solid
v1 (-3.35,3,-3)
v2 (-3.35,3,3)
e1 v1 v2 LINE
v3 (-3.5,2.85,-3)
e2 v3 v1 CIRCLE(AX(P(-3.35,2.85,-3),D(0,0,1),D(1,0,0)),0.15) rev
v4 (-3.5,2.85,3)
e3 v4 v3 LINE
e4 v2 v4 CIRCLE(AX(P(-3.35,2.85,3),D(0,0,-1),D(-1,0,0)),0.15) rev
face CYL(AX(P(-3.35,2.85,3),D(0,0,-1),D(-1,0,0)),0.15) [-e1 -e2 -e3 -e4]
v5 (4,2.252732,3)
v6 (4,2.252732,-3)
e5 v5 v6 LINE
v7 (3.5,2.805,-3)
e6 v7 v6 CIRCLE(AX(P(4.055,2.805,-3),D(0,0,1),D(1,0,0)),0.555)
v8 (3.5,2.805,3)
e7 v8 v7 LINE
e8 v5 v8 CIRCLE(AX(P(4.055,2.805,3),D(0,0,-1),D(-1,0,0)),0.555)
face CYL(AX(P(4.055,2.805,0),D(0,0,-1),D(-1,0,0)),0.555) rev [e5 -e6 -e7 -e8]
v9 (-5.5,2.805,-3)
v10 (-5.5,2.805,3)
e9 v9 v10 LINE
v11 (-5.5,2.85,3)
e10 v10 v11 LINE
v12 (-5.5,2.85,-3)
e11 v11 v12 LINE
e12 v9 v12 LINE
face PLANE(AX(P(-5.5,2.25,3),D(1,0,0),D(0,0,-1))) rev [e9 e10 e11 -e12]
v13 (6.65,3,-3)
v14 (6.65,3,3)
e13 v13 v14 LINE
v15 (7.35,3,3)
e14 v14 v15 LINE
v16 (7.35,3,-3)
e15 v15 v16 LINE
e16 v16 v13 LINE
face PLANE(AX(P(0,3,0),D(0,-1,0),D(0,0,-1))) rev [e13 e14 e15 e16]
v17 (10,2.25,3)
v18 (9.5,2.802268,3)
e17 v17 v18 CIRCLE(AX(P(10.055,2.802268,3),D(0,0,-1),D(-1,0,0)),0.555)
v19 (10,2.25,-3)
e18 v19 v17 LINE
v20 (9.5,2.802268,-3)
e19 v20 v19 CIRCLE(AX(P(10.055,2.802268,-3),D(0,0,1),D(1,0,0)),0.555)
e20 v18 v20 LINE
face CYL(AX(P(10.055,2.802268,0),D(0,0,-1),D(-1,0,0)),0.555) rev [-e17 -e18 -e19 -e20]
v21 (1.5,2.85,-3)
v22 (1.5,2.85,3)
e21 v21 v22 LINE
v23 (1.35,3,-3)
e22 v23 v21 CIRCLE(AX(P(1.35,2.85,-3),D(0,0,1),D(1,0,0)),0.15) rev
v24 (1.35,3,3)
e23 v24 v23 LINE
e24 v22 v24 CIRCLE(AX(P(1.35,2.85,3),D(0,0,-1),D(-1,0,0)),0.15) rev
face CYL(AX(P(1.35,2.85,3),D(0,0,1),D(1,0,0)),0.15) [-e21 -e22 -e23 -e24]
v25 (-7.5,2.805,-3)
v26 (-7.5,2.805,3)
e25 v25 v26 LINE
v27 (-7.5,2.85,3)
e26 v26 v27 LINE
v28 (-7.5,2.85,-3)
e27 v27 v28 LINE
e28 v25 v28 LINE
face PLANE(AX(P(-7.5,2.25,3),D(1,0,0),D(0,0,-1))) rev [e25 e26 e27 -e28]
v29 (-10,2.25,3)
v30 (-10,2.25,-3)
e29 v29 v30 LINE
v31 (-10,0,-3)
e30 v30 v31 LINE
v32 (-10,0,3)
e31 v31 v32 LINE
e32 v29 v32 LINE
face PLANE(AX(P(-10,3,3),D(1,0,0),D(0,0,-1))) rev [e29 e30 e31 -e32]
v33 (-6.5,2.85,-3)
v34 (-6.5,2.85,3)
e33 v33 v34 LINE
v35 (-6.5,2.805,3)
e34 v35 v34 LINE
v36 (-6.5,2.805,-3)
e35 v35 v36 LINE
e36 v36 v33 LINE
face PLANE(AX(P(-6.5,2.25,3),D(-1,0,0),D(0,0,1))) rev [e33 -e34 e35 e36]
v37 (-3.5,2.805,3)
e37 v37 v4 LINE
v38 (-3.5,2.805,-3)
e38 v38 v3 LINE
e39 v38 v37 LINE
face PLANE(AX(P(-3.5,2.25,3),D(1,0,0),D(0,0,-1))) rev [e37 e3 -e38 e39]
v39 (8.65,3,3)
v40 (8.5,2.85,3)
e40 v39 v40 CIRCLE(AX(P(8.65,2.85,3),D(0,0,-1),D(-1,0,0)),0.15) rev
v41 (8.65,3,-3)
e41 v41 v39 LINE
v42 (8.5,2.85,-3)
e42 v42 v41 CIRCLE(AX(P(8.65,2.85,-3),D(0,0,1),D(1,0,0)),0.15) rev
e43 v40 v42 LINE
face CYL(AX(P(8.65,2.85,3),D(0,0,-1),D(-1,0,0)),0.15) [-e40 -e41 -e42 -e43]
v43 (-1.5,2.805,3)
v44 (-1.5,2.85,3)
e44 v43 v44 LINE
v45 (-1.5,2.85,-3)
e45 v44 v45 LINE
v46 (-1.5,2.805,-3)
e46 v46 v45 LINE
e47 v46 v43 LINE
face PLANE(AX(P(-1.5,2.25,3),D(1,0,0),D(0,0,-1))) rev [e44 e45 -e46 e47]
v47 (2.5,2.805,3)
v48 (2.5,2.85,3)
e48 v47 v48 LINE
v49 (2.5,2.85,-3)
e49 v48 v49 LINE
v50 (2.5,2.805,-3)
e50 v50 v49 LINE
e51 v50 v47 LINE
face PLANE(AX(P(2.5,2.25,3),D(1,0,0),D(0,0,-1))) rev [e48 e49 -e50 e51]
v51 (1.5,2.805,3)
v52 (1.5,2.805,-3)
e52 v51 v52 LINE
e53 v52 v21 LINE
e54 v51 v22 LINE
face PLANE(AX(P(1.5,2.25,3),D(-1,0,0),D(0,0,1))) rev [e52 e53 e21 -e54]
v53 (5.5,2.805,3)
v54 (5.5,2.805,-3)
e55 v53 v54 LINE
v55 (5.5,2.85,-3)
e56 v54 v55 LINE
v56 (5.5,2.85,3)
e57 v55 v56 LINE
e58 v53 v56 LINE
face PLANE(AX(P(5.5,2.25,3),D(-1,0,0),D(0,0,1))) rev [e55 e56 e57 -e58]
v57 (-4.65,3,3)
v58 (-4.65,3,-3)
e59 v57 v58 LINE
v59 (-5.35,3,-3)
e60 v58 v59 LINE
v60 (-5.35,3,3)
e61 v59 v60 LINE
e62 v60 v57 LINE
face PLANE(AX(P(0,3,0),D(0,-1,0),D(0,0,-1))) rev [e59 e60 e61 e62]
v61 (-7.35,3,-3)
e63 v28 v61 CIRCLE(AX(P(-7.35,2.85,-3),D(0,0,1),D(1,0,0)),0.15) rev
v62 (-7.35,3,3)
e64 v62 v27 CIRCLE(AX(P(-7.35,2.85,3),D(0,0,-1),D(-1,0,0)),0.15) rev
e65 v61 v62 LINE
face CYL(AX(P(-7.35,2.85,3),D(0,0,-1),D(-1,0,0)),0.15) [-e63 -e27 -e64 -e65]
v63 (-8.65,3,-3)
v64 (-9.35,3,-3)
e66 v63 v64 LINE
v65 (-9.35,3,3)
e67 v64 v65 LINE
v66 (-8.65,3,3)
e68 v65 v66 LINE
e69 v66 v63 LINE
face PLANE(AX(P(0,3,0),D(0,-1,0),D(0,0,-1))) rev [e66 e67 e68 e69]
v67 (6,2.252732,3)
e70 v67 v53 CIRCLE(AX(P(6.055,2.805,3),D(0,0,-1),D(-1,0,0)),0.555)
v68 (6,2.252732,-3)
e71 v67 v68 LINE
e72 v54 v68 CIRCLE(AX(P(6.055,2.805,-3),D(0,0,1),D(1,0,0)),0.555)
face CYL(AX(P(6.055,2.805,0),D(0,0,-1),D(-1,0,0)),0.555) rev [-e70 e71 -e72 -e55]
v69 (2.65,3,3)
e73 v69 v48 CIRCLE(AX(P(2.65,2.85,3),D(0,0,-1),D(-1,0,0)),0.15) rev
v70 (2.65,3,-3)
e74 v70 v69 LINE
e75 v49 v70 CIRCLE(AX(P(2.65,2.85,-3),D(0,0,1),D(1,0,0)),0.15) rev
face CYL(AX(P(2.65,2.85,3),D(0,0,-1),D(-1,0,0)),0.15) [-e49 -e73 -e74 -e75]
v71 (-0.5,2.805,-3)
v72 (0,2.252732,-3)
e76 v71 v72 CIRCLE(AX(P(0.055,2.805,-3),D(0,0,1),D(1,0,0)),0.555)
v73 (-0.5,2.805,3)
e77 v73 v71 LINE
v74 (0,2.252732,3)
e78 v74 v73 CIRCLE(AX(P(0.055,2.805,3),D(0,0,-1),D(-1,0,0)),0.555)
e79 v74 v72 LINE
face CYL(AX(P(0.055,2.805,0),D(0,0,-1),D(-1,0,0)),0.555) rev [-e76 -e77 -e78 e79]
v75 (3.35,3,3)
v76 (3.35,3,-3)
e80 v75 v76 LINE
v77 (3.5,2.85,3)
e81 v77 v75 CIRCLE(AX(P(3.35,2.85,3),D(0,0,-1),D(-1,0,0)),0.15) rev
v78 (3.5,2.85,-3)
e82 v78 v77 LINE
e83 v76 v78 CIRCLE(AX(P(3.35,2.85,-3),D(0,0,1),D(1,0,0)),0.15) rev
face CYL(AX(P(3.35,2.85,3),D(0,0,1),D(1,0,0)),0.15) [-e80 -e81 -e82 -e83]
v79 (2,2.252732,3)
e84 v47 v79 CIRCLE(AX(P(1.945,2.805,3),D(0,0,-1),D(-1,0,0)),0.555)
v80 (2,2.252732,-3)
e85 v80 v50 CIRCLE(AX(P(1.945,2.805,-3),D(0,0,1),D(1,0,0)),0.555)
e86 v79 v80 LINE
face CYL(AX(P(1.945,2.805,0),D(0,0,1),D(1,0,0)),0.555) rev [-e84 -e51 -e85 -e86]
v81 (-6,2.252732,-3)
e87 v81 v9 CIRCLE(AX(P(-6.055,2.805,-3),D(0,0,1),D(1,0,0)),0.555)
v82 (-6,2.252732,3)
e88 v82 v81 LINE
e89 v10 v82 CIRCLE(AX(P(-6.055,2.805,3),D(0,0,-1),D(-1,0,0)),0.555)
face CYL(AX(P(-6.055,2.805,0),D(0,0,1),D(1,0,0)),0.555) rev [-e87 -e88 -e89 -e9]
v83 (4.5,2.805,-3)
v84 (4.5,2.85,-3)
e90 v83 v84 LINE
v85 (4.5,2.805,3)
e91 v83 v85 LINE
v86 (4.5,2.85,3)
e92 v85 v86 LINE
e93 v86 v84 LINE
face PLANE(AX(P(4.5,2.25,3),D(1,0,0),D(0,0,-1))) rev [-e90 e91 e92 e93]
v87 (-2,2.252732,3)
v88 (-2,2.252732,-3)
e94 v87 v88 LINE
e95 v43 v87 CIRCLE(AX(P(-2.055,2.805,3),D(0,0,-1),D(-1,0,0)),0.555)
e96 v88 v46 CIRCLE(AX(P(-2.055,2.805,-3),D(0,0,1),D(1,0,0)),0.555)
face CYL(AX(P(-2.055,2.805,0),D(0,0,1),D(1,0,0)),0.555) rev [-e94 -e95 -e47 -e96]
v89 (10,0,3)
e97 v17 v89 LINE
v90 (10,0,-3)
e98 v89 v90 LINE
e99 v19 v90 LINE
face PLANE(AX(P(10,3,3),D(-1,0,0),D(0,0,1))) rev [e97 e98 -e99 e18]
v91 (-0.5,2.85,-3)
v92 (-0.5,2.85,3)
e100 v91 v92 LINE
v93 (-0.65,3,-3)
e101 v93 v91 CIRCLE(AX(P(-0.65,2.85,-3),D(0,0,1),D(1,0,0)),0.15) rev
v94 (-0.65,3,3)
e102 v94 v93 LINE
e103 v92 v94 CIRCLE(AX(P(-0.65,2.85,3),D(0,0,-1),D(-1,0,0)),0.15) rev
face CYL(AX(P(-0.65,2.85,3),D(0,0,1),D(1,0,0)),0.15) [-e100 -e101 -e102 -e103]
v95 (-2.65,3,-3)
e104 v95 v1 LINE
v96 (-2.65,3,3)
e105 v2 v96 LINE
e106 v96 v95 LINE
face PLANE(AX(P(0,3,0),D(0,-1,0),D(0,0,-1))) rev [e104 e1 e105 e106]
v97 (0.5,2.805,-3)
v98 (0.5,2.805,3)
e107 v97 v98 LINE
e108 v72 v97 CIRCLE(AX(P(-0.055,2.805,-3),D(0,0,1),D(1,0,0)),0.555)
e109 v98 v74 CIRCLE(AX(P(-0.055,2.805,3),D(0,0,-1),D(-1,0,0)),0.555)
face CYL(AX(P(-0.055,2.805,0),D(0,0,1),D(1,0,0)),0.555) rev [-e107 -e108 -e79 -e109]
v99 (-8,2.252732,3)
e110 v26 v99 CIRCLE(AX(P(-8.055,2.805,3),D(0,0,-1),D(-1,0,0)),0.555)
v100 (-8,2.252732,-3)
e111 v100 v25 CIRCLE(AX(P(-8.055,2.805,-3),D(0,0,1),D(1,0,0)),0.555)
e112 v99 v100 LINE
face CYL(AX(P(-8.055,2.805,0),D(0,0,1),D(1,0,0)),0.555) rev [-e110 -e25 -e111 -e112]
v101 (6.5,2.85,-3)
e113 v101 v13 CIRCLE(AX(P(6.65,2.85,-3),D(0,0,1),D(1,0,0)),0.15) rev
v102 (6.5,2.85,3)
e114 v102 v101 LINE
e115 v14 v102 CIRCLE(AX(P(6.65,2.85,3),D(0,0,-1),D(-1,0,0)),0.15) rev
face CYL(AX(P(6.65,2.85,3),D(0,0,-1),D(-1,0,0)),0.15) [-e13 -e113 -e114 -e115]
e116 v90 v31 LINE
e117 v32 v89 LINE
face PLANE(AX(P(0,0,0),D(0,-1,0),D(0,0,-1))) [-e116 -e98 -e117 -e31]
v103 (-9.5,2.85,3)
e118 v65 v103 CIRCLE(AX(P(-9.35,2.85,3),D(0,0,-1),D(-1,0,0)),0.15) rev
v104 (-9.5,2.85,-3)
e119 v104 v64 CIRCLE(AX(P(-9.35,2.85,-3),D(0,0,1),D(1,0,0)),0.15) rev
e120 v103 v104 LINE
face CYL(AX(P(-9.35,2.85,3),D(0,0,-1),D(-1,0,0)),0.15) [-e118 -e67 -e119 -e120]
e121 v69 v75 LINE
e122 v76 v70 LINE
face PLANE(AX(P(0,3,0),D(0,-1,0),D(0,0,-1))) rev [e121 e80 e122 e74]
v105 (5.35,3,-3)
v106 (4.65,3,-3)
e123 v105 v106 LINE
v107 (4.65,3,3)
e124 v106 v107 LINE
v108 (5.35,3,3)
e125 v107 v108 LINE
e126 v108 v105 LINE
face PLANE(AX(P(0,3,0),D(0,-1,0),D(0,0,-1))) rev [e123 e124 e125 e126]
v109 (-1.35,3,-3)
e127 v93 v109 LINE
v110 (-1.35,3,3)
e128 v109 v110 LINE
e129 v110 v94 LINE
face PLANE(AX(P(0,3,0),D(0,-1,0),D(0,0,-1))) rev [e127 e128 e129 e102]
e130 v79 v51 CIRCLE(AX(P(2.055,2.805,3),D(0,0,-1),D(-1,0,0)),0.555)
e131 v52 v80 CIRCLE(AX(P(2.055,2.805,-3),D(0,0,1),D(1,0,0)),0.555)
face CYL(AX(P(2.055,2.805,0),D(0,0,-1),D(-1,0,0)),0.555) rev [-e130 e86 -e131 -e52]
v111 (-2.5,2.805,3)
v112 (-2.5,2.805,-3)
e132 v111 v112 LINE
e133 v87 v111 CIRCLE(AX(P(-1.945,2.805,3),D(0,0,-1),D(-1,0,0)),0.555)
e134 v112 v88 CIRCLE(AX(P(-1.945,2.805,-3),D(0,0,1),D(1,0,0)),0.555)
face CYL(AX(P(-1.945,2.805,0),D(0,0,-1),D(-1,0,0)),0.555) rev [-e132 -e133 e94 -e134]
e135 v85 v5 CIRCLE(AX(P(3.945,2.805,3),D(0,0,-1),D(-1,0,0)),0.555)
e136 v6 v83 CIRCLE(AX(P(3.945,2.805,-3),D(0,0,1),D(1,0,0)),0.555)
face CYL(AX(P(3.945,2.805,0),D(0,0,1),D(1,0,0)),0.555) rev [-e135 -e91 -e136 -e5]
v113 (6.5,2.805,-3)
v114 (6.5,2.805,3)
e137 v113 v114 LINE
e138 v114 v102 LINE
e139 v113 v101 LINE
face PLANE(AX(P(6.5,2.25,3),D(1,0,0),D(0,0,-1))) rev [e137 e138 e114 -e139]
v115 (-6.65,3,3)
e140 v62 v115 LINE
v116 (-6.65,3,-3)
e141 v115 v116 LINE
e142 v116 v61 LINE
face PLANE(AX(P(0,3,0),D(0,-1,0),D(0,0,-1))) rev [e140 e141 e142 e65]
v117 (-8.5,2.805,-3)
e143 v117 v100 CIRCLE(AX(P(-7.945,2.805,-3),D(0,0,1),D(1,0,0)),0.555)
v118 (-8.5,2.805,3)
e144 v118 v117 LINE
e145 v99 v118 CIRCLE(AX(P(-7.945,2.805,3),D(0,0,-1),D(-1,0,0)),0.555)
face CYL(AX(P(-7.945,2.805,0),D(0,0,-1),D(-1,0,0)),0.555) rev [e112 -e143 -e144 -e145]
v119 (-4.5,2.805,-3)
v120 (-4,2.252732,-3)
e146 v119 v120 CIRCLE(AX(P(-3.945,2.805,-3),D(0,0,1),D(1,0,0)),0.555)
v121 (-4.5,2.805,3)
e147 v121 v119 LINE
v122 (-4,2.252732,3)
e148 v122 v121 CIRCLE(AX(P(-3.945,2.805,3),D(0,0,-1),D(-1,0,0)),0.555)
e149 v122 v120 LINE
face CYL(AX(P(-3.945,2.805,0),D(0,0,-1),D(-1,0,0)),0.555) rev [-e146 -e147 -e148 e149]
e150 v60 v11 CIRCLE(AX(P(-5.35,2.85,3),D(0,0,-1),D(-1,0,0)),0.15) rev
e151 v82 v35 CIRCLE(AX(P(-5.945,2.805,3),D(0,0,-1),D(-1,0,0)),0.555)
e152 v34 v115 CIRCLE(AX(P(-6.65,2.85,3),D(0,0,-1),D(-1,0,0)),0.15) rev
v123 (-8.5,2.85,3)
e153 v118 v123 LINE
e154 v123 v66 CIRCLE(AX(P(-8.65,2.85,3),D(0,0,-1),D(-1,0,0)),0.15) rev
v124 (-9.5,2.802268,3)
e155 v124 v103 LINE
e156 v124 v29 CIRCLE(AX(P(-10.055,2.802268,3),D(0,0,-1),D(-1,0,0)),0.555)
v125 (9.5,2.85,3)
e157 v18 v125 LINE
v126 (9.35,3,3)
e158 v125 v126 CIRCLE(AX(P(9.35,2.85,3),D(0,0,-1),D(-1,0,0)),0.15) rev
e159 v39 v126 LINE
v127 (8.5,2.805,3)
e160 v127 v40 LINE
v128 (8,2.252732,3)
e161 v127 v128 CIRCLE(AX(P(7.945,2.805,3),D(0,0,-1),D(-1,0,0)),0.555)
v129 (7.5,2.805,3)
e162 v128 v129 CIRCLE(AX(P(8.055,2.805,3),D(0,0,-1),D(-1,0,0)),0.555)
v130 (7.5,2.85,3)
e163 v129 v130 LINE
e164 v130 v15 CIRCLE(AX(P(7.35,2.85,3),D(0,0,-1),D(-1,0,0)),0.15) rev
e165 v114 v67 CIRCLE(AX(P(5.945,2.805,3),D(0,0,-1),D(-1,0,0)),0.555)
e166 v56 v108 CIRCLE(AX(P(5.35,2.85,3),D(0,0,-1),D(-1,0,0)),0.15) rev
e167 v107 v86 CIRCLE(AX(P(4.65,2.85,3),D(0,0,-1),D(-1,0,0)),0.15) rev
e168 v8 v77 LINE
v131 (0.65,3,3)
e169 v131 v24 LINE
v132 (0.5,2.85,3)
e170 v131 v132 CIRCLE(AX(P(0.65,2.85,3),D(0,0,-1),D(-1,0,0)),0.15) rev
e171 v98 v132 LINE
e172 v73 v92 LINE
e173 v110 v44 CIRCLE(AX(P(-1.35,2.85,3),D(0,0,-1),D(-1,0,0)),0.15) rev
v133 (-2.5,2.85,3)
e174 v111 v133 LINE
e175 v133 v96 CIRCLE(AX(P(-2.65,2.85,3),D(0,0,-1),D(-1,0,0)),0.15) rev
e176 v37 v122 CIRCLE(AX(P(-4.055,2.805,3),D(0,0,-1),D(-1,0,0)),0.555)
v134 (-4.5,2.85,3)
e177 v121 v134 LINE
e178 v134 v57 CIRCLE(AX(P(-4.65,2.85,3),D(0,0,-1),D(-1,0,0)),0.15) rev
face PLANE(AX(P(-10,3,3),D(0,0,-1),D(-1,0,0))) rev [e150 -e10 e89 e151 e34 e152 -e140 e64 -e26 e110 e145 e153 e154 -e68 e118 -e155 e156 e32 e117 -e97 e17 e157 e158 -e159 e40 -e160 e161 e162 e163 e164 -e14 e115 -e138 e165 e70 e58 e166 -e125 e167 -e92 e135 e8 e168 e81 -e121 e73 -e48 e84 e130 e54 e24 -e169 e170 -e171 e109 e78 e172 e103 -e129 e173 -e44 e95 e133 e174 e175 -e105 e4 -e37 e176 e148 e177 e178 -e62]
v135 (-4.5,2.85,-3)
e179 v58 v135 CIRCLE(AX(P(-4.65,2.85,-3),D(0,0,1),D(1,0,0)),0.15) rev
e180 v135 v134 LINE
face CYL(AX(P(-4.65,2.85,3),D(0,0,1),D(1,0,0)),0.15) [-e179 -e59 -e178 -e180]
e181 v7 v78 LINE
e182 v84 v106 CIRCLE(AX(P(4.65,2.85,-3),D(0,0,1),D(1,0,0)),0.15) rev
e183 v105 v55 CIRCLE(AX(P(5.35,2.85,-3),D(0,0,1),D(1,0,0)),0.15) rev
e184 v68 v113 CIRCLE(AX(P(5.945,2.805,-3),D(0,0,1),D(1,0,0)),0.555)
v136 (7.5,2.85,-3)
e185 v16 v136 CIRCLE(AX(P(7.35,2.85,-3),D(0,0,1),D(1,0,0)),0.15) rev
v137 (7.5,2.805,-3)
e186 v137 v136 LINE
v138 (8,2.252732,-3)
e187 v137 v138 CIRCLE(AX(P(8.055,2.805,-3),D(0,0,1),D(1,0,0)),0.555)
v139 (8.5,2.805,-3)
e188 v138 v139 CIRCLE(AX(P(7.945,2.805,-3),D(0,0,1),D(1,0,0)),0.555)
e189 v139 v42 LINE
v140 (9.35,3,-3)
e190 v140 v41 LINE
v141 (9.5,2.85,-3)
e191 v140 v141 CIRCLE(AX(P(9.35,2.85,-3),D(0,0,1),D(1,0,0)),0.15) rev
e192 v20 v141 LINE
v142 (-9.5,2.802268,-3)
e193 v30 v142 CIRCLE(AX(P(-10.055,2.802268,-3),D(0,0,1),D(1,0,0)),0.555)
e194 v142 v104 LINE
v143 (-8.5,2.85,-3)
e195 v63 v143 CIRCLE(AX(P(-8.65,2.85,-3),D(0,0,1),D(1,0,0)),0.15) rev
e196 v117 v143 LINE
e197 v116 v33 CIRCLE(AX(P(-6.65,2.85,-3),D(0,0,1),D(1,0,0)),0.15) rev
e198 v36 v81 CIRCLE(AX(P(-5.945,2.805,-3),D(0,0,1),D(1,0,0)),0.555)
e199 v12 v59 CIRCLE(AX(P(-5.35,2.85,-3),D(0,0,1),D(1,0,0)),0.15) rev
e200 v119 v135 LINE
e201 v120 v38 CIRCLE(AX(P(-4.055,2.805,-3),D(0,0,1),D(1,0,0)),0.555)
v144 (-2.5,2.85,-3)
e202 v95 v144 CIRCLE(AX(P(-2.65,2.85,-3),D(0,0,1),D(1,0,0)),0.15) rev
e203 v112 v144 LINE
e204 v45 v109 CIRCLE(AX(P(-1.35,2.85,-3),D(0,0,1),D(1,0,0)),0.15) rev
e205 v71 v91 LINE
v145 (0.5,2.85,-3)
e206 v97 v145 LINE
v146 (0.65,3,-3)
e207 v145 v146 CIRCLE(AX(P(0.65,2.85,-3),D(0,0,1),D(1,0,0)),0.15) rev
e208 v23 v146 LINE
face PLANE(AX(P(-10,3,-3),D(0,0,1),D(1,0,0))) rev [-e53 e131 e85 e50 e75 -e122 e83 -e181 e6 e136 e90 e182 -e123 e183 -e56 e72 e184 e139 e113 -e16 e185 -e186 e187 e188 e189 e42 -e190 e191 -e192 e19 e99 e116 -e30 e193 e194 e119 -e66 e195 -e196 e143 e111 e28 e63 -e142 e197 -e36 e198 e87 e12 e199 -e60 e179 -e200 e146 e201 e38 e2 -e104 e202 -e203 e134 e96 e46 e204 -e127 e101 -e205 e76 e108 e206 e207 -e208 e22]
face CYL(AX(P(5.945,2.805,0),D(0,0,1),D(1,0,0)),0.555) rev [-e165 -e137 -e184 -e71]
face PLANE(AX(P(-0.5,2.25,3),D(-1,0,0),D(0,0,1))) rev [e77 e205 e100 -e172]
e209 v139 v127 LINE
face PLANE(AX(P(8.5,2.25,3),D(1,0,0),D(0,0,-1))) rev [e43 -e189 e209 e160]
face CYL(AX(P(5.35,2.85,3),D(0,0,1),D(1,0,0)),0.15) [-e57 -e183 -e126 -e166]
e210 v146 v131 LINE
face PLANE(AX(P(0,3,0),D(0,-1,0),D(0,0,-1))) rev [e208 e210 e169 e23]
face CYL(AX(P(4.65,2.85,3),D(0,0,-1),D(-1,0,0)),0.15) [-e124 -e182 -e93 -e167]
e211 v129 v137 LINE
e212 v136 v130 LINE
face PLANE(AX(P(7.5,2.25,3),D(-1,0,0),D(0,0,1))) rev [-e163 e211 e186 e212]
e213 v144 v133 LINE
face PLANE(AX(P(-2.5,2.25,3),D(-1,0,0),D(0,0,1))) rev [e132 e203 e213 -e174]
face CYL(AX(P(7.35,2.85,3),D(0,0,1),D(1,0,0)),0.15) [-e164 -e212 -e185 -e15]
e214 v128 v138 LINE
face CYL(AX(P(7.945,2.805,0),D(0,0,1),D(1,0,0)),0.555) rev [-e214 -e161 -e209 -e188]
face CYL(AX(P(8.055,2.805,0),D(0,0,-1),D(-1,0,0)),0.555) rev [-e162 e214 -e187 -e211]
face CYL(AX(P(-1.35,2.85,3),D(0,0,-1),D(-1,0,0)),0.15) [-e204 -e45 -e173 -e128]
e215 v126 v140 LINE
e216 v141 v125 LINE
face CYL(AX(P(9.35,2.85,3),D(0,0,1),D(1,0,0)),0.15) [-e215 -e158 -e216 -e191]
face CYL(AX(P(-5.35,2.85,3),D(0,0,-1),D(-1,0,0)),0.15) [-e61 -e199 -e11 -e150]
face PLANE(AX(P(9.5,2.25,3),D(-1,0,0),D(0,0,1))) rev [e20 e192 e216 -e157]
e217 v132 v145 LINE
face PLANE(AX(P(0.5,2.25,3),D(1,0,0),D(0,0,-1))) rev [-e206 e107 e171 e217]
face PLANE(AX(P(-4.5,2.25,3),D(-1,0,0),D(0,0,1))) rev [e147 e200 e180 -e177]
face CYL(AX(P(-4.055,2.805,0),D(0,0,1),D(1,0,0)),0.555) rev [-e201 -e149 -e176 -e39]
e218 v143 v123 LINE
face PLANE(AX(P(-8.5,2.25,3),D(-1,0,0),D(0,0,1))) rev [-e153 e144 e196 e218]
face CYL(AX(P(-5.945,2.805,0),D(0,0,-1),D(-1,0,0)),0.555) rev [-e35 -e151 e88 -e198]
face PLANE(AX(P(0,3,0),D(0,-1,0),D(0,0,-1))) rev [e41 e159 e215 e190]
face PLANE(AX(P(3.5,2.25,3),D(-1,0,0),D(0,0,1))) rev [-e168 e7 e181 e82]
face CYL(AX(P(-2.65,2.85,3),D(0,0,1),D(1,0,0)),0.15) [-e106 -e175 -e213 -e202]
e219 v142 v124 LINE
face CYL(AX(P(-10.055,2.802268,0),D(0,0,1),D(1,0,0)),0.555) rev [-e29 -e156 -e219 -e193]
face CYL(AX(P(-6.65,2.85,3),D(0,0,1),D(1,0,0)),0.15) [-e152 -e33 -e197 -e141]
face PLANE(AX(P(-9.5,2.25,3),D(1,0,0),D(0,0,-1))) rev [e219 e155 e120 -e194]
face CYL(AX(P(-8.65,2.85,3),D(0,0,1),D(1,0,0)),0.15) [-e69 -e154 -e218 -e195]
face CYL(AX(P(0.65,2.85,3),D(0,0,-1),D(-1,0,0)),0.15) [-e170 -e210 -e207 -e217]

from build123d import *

# Parameters (mm, degrees)
SKETCH1_W           = 20
SKETCH1_H           = 6
BOSS_EXTRUDE1_DEPTH = 3
SKETCH2_W           = 1
SKETCH2_H           = 6
CUT_EXTRUDE1_DEPTH  = 0.75
FILLET1_R           = 0.15
FILLET2_R           = 0.555


with BuildPart() as part:
    # Sketch1 → Boss-Extrude1 (new body)
    with BuildSketch(Plane(origin=(0, 0, 0), x_dir=(1, 0, 0), z_dir=(0, 1, 0))):
        Rectangle(SKETCH1_W, SKETCH1_H)
    extrude(amount=BOSS_EXTRUDE1_DEPTH)

    # Sketch2 → Cut-Extrude1 (cut)
    with BuildSketch(Plane(origin=(0, 3, 0), x_dir=(1, 0, 0), z_dir=(0, 1, 0))):
        Rectangle(SKETCH2_W, SKETCH2_H)
        with Locations((2, 0)):
            Rectangle(SKETCH2_W, SKETCH2_H)
        with Locations((4, 0)):
            Rectangle(SKETCH2_W, SKETCH2_H)
        with Locations((6, 0)):
            Rectangle(SKETCH2_W, SKETCH2_H)
        with Locations((8, 0)):
            Rectangle(SKETCH2_W, SKETCH2_H)
        with Locations((10, 0)):
            Rectangle(SKETCH2_W, SKETCH2_H)
        with Locations((-2, 0)):
            Rectangle(SKETCH2_W, SKETCH2_H)
        with Locations((-4, 0)):
            Rectangle(SKETCH2_W, SKETCH2_H)
        with Locations((-6, 0)):
            Rectangle(SKETCH2_W, SKETCH2_H)
        with Locations((-8, 0)):
            Rectangle(SKETCH2_W, SKETCH2_H)
        with Locations((-10, 0)):
            Rectangle(SKETCH2_W, SKETCH2_H)
    extrude(amount=-CUT_EXTRUDE1_DEPTH, mode=Mode.SUBTRACT)

    # Fillet1
    fillet1_edges = [part.edges().sort_by_distance(p)[0] for p in [
        (8.5, 3, 0),
        (7.5, 3, 0),
        (9.5, 3, 0),
        (-1.5, 3, 0),
        (-2.5, 3, 0),
        (-3.5, 3, 0),
        (-4.5, 3, 0),
        (-5.5, 3, 0),
        (-6.5, 3, 0),
        (0.5, 3, 0),
        (-0.5, 3, 0),
        (-9.5, 3, 0),
        (-7.5, 3, 0),
        (-8.5, 3, 0),
        (2.5, 3, 0),
        (1.5, 3, 0),
        (4.5, 3, 0),
        (3.5, 3, 0),
        (6.5, 3, 0),
        (5.5, 3, 0),
    ]]
    fillet(fillet1_edges, radius=FILLET1_R)

    # Fillet2
    # the kernel refuses this fillet: 0.555 mm, written as the material it adds along each edge
    with BuildSketch(Plane(origin=(-8.5, 2.25, -3), x_dir=(0, 1, 0), z_dir=(0, 0, 1)), Plane(origin=(-6.5, 2.25, -3), x_dir=(0, 1, 0), z_dir=(0, 0, 1)), Plane(origin=(-4.5, 2.25, -3), x_dir=(0, 1, 0), z_dir=(0, 0, 1)), Plane(origin=(-2.5, 2.25, -3), x_dir=(0, 1, 0), z_dir=(0, 0, 1)), Plane(origin=(8.5, 2.25, 3), x_dir=(0, 1, 0), z_dir=(0, 0, -1)), Plane(origin=(6.5, 2.25, 3), x_dir=(0, 1, 0), z_dir=(0, 0, -1)), Plane(origin=(4.5, 2.25, 3), x_dir=(0, 1, 0), z_dir=(0, 0, -1)), Plane(origin=(2.5, 2.25, 3), x_dir=(0, 1, 0), z_dir=(0, 0, -1)), Plane(origin=(0.5, 2.25, 3), x_dir=(0, 1, 0), z_dir=(0, 0, -1))) as fillet2_piece_1:
        with BuildLine():
            CenterArc((FILLET2_R, -FILLET2_R), FILLET2_R, 90, 90)
            Line((0, -FILLET2_R), (-FILLET2_R * 0.02, -FILLET2_R))
            Line((-FILLET2_R * 0.02, -FILLET2_R), (-FILLET2_R * 0.02, FILLET2_R * 0.02))
            Line((-FILLET2_R * 0.02, FILLET2_R * 0.02), (FILLET2_R, FILLET2_R * 0.02))
            Line((FILLET2_R, FILLET2_R * 0.02), (FILLET2_R, 0))
        make_face()
    extrude(amount=6)
    with BuildSketch(Plane(origin=(-0.5, 2.25, -3), x_dir=(1, 0, 0), z_dir=(0, 0, 1)), Plane(origin=(1.5, 2.25, -3), x_dir=(1, 0, 0), z_dir=(0, 0, 1)), Plane(origin=(3.5, 2.25, -3), x_dir=(1, 0, 0), z_dir=(0, 0, 1)), Plane(origin=(5.5, 2.25, -3), x_dir=(1, 0, 0), z_dir=(0, 0, 1)), Plane(origin=(7.5, 2.25, -3), x_dir=(1, 0, 0), z_dir=(0, 0, 1)), Plane(origin=(-1.5, 2.25, 3), x_dir=(-1, 0, 0), z_dir=(0, 0, -1)), Plane(origin=(-3.5, 2.25, 3), x_dir=(-1, 0, 0), z_dir=(0, 0, -1)), Plane(origin=(-5.5, 2.25, 3), x_dir=(-1, 0, 0), z_dir=(0, 0, -1)), Plane(origin=(-7.5, 2.25, 3), x_dir=(-1, 0, 0), z_dir=(0, 0, -1))) as fillet2_piece_2:
        with BuildLine():
            CenterArc((FILLET2_R, FILLET2_R), FILLET2_R, 180, 90)
            Line((0, FILLET2_R), (-FILLET2_R * 0.02, FILLET2_R))
            Line((-FILLET2_R * 0.02, FILLET2_R), (-FILLET2_R * 0.02, -FILLET2_R * 0.02))
            Line((-FILLET2_R * 0.02, -FILLET2_R * 0.02), (FILLET2_R, -FILLET2_R * 0.02))
            Line((FILLET2_R, -FILLET2_R * 0.02), (FILLET2_R, 0))
        make_face()
    extrude(amount=6)
    with BuildSketch(Plane(origin=(9.5, 2.25, -3), x_dir=(0, 1, 0), z_dir=(0, 0, 1))) as fillet2_piece_3:
        with BuildLine():
            CenterArc((0.552268051, -0.555), FILLET2_R, 90, 84.31270503)
            Line((0, -0.5), (-0.011045361, -0.4989))
            ThreePointArc((-0.011045361, -0.4989), (-0.0111, -0.25), (-0.0111, 0))
            Line((-0.0111, 0), (0, 0.0111))
            Line((0, 0.0111), (0.552268051, 0.0111))
            Line((0.552268051, 0.0111), (0.552268051, 0))
        make_face()
    extrude(amount=6)
    with BuildSketch(Plane(origin=(-9.5, 2.25, 3), x_dir=(-1, 0, 0), z_dir=(0, 0, -1))) as fillet2_piece_4:
        with BuildLine():
            CenterArc((0.555, 0.552268051), FILLET2_R, 180, 84.31270503)
            Line((0, 0.552268051), (-0.0111, 0.552268051))
            Line((-0.0111, 0.552268051), (-0.0111, 0))
            Line((-0.0111, 0), (0, -0.0111))
            ThreePointArc((0, -0.0111), (0.25, -0.0111), (0.4989, -0.011045361))
            Line((0.4989, -0.011045361), (0.5, 0))
        make_face()
    extrude(amount=6)


solid = part.part
